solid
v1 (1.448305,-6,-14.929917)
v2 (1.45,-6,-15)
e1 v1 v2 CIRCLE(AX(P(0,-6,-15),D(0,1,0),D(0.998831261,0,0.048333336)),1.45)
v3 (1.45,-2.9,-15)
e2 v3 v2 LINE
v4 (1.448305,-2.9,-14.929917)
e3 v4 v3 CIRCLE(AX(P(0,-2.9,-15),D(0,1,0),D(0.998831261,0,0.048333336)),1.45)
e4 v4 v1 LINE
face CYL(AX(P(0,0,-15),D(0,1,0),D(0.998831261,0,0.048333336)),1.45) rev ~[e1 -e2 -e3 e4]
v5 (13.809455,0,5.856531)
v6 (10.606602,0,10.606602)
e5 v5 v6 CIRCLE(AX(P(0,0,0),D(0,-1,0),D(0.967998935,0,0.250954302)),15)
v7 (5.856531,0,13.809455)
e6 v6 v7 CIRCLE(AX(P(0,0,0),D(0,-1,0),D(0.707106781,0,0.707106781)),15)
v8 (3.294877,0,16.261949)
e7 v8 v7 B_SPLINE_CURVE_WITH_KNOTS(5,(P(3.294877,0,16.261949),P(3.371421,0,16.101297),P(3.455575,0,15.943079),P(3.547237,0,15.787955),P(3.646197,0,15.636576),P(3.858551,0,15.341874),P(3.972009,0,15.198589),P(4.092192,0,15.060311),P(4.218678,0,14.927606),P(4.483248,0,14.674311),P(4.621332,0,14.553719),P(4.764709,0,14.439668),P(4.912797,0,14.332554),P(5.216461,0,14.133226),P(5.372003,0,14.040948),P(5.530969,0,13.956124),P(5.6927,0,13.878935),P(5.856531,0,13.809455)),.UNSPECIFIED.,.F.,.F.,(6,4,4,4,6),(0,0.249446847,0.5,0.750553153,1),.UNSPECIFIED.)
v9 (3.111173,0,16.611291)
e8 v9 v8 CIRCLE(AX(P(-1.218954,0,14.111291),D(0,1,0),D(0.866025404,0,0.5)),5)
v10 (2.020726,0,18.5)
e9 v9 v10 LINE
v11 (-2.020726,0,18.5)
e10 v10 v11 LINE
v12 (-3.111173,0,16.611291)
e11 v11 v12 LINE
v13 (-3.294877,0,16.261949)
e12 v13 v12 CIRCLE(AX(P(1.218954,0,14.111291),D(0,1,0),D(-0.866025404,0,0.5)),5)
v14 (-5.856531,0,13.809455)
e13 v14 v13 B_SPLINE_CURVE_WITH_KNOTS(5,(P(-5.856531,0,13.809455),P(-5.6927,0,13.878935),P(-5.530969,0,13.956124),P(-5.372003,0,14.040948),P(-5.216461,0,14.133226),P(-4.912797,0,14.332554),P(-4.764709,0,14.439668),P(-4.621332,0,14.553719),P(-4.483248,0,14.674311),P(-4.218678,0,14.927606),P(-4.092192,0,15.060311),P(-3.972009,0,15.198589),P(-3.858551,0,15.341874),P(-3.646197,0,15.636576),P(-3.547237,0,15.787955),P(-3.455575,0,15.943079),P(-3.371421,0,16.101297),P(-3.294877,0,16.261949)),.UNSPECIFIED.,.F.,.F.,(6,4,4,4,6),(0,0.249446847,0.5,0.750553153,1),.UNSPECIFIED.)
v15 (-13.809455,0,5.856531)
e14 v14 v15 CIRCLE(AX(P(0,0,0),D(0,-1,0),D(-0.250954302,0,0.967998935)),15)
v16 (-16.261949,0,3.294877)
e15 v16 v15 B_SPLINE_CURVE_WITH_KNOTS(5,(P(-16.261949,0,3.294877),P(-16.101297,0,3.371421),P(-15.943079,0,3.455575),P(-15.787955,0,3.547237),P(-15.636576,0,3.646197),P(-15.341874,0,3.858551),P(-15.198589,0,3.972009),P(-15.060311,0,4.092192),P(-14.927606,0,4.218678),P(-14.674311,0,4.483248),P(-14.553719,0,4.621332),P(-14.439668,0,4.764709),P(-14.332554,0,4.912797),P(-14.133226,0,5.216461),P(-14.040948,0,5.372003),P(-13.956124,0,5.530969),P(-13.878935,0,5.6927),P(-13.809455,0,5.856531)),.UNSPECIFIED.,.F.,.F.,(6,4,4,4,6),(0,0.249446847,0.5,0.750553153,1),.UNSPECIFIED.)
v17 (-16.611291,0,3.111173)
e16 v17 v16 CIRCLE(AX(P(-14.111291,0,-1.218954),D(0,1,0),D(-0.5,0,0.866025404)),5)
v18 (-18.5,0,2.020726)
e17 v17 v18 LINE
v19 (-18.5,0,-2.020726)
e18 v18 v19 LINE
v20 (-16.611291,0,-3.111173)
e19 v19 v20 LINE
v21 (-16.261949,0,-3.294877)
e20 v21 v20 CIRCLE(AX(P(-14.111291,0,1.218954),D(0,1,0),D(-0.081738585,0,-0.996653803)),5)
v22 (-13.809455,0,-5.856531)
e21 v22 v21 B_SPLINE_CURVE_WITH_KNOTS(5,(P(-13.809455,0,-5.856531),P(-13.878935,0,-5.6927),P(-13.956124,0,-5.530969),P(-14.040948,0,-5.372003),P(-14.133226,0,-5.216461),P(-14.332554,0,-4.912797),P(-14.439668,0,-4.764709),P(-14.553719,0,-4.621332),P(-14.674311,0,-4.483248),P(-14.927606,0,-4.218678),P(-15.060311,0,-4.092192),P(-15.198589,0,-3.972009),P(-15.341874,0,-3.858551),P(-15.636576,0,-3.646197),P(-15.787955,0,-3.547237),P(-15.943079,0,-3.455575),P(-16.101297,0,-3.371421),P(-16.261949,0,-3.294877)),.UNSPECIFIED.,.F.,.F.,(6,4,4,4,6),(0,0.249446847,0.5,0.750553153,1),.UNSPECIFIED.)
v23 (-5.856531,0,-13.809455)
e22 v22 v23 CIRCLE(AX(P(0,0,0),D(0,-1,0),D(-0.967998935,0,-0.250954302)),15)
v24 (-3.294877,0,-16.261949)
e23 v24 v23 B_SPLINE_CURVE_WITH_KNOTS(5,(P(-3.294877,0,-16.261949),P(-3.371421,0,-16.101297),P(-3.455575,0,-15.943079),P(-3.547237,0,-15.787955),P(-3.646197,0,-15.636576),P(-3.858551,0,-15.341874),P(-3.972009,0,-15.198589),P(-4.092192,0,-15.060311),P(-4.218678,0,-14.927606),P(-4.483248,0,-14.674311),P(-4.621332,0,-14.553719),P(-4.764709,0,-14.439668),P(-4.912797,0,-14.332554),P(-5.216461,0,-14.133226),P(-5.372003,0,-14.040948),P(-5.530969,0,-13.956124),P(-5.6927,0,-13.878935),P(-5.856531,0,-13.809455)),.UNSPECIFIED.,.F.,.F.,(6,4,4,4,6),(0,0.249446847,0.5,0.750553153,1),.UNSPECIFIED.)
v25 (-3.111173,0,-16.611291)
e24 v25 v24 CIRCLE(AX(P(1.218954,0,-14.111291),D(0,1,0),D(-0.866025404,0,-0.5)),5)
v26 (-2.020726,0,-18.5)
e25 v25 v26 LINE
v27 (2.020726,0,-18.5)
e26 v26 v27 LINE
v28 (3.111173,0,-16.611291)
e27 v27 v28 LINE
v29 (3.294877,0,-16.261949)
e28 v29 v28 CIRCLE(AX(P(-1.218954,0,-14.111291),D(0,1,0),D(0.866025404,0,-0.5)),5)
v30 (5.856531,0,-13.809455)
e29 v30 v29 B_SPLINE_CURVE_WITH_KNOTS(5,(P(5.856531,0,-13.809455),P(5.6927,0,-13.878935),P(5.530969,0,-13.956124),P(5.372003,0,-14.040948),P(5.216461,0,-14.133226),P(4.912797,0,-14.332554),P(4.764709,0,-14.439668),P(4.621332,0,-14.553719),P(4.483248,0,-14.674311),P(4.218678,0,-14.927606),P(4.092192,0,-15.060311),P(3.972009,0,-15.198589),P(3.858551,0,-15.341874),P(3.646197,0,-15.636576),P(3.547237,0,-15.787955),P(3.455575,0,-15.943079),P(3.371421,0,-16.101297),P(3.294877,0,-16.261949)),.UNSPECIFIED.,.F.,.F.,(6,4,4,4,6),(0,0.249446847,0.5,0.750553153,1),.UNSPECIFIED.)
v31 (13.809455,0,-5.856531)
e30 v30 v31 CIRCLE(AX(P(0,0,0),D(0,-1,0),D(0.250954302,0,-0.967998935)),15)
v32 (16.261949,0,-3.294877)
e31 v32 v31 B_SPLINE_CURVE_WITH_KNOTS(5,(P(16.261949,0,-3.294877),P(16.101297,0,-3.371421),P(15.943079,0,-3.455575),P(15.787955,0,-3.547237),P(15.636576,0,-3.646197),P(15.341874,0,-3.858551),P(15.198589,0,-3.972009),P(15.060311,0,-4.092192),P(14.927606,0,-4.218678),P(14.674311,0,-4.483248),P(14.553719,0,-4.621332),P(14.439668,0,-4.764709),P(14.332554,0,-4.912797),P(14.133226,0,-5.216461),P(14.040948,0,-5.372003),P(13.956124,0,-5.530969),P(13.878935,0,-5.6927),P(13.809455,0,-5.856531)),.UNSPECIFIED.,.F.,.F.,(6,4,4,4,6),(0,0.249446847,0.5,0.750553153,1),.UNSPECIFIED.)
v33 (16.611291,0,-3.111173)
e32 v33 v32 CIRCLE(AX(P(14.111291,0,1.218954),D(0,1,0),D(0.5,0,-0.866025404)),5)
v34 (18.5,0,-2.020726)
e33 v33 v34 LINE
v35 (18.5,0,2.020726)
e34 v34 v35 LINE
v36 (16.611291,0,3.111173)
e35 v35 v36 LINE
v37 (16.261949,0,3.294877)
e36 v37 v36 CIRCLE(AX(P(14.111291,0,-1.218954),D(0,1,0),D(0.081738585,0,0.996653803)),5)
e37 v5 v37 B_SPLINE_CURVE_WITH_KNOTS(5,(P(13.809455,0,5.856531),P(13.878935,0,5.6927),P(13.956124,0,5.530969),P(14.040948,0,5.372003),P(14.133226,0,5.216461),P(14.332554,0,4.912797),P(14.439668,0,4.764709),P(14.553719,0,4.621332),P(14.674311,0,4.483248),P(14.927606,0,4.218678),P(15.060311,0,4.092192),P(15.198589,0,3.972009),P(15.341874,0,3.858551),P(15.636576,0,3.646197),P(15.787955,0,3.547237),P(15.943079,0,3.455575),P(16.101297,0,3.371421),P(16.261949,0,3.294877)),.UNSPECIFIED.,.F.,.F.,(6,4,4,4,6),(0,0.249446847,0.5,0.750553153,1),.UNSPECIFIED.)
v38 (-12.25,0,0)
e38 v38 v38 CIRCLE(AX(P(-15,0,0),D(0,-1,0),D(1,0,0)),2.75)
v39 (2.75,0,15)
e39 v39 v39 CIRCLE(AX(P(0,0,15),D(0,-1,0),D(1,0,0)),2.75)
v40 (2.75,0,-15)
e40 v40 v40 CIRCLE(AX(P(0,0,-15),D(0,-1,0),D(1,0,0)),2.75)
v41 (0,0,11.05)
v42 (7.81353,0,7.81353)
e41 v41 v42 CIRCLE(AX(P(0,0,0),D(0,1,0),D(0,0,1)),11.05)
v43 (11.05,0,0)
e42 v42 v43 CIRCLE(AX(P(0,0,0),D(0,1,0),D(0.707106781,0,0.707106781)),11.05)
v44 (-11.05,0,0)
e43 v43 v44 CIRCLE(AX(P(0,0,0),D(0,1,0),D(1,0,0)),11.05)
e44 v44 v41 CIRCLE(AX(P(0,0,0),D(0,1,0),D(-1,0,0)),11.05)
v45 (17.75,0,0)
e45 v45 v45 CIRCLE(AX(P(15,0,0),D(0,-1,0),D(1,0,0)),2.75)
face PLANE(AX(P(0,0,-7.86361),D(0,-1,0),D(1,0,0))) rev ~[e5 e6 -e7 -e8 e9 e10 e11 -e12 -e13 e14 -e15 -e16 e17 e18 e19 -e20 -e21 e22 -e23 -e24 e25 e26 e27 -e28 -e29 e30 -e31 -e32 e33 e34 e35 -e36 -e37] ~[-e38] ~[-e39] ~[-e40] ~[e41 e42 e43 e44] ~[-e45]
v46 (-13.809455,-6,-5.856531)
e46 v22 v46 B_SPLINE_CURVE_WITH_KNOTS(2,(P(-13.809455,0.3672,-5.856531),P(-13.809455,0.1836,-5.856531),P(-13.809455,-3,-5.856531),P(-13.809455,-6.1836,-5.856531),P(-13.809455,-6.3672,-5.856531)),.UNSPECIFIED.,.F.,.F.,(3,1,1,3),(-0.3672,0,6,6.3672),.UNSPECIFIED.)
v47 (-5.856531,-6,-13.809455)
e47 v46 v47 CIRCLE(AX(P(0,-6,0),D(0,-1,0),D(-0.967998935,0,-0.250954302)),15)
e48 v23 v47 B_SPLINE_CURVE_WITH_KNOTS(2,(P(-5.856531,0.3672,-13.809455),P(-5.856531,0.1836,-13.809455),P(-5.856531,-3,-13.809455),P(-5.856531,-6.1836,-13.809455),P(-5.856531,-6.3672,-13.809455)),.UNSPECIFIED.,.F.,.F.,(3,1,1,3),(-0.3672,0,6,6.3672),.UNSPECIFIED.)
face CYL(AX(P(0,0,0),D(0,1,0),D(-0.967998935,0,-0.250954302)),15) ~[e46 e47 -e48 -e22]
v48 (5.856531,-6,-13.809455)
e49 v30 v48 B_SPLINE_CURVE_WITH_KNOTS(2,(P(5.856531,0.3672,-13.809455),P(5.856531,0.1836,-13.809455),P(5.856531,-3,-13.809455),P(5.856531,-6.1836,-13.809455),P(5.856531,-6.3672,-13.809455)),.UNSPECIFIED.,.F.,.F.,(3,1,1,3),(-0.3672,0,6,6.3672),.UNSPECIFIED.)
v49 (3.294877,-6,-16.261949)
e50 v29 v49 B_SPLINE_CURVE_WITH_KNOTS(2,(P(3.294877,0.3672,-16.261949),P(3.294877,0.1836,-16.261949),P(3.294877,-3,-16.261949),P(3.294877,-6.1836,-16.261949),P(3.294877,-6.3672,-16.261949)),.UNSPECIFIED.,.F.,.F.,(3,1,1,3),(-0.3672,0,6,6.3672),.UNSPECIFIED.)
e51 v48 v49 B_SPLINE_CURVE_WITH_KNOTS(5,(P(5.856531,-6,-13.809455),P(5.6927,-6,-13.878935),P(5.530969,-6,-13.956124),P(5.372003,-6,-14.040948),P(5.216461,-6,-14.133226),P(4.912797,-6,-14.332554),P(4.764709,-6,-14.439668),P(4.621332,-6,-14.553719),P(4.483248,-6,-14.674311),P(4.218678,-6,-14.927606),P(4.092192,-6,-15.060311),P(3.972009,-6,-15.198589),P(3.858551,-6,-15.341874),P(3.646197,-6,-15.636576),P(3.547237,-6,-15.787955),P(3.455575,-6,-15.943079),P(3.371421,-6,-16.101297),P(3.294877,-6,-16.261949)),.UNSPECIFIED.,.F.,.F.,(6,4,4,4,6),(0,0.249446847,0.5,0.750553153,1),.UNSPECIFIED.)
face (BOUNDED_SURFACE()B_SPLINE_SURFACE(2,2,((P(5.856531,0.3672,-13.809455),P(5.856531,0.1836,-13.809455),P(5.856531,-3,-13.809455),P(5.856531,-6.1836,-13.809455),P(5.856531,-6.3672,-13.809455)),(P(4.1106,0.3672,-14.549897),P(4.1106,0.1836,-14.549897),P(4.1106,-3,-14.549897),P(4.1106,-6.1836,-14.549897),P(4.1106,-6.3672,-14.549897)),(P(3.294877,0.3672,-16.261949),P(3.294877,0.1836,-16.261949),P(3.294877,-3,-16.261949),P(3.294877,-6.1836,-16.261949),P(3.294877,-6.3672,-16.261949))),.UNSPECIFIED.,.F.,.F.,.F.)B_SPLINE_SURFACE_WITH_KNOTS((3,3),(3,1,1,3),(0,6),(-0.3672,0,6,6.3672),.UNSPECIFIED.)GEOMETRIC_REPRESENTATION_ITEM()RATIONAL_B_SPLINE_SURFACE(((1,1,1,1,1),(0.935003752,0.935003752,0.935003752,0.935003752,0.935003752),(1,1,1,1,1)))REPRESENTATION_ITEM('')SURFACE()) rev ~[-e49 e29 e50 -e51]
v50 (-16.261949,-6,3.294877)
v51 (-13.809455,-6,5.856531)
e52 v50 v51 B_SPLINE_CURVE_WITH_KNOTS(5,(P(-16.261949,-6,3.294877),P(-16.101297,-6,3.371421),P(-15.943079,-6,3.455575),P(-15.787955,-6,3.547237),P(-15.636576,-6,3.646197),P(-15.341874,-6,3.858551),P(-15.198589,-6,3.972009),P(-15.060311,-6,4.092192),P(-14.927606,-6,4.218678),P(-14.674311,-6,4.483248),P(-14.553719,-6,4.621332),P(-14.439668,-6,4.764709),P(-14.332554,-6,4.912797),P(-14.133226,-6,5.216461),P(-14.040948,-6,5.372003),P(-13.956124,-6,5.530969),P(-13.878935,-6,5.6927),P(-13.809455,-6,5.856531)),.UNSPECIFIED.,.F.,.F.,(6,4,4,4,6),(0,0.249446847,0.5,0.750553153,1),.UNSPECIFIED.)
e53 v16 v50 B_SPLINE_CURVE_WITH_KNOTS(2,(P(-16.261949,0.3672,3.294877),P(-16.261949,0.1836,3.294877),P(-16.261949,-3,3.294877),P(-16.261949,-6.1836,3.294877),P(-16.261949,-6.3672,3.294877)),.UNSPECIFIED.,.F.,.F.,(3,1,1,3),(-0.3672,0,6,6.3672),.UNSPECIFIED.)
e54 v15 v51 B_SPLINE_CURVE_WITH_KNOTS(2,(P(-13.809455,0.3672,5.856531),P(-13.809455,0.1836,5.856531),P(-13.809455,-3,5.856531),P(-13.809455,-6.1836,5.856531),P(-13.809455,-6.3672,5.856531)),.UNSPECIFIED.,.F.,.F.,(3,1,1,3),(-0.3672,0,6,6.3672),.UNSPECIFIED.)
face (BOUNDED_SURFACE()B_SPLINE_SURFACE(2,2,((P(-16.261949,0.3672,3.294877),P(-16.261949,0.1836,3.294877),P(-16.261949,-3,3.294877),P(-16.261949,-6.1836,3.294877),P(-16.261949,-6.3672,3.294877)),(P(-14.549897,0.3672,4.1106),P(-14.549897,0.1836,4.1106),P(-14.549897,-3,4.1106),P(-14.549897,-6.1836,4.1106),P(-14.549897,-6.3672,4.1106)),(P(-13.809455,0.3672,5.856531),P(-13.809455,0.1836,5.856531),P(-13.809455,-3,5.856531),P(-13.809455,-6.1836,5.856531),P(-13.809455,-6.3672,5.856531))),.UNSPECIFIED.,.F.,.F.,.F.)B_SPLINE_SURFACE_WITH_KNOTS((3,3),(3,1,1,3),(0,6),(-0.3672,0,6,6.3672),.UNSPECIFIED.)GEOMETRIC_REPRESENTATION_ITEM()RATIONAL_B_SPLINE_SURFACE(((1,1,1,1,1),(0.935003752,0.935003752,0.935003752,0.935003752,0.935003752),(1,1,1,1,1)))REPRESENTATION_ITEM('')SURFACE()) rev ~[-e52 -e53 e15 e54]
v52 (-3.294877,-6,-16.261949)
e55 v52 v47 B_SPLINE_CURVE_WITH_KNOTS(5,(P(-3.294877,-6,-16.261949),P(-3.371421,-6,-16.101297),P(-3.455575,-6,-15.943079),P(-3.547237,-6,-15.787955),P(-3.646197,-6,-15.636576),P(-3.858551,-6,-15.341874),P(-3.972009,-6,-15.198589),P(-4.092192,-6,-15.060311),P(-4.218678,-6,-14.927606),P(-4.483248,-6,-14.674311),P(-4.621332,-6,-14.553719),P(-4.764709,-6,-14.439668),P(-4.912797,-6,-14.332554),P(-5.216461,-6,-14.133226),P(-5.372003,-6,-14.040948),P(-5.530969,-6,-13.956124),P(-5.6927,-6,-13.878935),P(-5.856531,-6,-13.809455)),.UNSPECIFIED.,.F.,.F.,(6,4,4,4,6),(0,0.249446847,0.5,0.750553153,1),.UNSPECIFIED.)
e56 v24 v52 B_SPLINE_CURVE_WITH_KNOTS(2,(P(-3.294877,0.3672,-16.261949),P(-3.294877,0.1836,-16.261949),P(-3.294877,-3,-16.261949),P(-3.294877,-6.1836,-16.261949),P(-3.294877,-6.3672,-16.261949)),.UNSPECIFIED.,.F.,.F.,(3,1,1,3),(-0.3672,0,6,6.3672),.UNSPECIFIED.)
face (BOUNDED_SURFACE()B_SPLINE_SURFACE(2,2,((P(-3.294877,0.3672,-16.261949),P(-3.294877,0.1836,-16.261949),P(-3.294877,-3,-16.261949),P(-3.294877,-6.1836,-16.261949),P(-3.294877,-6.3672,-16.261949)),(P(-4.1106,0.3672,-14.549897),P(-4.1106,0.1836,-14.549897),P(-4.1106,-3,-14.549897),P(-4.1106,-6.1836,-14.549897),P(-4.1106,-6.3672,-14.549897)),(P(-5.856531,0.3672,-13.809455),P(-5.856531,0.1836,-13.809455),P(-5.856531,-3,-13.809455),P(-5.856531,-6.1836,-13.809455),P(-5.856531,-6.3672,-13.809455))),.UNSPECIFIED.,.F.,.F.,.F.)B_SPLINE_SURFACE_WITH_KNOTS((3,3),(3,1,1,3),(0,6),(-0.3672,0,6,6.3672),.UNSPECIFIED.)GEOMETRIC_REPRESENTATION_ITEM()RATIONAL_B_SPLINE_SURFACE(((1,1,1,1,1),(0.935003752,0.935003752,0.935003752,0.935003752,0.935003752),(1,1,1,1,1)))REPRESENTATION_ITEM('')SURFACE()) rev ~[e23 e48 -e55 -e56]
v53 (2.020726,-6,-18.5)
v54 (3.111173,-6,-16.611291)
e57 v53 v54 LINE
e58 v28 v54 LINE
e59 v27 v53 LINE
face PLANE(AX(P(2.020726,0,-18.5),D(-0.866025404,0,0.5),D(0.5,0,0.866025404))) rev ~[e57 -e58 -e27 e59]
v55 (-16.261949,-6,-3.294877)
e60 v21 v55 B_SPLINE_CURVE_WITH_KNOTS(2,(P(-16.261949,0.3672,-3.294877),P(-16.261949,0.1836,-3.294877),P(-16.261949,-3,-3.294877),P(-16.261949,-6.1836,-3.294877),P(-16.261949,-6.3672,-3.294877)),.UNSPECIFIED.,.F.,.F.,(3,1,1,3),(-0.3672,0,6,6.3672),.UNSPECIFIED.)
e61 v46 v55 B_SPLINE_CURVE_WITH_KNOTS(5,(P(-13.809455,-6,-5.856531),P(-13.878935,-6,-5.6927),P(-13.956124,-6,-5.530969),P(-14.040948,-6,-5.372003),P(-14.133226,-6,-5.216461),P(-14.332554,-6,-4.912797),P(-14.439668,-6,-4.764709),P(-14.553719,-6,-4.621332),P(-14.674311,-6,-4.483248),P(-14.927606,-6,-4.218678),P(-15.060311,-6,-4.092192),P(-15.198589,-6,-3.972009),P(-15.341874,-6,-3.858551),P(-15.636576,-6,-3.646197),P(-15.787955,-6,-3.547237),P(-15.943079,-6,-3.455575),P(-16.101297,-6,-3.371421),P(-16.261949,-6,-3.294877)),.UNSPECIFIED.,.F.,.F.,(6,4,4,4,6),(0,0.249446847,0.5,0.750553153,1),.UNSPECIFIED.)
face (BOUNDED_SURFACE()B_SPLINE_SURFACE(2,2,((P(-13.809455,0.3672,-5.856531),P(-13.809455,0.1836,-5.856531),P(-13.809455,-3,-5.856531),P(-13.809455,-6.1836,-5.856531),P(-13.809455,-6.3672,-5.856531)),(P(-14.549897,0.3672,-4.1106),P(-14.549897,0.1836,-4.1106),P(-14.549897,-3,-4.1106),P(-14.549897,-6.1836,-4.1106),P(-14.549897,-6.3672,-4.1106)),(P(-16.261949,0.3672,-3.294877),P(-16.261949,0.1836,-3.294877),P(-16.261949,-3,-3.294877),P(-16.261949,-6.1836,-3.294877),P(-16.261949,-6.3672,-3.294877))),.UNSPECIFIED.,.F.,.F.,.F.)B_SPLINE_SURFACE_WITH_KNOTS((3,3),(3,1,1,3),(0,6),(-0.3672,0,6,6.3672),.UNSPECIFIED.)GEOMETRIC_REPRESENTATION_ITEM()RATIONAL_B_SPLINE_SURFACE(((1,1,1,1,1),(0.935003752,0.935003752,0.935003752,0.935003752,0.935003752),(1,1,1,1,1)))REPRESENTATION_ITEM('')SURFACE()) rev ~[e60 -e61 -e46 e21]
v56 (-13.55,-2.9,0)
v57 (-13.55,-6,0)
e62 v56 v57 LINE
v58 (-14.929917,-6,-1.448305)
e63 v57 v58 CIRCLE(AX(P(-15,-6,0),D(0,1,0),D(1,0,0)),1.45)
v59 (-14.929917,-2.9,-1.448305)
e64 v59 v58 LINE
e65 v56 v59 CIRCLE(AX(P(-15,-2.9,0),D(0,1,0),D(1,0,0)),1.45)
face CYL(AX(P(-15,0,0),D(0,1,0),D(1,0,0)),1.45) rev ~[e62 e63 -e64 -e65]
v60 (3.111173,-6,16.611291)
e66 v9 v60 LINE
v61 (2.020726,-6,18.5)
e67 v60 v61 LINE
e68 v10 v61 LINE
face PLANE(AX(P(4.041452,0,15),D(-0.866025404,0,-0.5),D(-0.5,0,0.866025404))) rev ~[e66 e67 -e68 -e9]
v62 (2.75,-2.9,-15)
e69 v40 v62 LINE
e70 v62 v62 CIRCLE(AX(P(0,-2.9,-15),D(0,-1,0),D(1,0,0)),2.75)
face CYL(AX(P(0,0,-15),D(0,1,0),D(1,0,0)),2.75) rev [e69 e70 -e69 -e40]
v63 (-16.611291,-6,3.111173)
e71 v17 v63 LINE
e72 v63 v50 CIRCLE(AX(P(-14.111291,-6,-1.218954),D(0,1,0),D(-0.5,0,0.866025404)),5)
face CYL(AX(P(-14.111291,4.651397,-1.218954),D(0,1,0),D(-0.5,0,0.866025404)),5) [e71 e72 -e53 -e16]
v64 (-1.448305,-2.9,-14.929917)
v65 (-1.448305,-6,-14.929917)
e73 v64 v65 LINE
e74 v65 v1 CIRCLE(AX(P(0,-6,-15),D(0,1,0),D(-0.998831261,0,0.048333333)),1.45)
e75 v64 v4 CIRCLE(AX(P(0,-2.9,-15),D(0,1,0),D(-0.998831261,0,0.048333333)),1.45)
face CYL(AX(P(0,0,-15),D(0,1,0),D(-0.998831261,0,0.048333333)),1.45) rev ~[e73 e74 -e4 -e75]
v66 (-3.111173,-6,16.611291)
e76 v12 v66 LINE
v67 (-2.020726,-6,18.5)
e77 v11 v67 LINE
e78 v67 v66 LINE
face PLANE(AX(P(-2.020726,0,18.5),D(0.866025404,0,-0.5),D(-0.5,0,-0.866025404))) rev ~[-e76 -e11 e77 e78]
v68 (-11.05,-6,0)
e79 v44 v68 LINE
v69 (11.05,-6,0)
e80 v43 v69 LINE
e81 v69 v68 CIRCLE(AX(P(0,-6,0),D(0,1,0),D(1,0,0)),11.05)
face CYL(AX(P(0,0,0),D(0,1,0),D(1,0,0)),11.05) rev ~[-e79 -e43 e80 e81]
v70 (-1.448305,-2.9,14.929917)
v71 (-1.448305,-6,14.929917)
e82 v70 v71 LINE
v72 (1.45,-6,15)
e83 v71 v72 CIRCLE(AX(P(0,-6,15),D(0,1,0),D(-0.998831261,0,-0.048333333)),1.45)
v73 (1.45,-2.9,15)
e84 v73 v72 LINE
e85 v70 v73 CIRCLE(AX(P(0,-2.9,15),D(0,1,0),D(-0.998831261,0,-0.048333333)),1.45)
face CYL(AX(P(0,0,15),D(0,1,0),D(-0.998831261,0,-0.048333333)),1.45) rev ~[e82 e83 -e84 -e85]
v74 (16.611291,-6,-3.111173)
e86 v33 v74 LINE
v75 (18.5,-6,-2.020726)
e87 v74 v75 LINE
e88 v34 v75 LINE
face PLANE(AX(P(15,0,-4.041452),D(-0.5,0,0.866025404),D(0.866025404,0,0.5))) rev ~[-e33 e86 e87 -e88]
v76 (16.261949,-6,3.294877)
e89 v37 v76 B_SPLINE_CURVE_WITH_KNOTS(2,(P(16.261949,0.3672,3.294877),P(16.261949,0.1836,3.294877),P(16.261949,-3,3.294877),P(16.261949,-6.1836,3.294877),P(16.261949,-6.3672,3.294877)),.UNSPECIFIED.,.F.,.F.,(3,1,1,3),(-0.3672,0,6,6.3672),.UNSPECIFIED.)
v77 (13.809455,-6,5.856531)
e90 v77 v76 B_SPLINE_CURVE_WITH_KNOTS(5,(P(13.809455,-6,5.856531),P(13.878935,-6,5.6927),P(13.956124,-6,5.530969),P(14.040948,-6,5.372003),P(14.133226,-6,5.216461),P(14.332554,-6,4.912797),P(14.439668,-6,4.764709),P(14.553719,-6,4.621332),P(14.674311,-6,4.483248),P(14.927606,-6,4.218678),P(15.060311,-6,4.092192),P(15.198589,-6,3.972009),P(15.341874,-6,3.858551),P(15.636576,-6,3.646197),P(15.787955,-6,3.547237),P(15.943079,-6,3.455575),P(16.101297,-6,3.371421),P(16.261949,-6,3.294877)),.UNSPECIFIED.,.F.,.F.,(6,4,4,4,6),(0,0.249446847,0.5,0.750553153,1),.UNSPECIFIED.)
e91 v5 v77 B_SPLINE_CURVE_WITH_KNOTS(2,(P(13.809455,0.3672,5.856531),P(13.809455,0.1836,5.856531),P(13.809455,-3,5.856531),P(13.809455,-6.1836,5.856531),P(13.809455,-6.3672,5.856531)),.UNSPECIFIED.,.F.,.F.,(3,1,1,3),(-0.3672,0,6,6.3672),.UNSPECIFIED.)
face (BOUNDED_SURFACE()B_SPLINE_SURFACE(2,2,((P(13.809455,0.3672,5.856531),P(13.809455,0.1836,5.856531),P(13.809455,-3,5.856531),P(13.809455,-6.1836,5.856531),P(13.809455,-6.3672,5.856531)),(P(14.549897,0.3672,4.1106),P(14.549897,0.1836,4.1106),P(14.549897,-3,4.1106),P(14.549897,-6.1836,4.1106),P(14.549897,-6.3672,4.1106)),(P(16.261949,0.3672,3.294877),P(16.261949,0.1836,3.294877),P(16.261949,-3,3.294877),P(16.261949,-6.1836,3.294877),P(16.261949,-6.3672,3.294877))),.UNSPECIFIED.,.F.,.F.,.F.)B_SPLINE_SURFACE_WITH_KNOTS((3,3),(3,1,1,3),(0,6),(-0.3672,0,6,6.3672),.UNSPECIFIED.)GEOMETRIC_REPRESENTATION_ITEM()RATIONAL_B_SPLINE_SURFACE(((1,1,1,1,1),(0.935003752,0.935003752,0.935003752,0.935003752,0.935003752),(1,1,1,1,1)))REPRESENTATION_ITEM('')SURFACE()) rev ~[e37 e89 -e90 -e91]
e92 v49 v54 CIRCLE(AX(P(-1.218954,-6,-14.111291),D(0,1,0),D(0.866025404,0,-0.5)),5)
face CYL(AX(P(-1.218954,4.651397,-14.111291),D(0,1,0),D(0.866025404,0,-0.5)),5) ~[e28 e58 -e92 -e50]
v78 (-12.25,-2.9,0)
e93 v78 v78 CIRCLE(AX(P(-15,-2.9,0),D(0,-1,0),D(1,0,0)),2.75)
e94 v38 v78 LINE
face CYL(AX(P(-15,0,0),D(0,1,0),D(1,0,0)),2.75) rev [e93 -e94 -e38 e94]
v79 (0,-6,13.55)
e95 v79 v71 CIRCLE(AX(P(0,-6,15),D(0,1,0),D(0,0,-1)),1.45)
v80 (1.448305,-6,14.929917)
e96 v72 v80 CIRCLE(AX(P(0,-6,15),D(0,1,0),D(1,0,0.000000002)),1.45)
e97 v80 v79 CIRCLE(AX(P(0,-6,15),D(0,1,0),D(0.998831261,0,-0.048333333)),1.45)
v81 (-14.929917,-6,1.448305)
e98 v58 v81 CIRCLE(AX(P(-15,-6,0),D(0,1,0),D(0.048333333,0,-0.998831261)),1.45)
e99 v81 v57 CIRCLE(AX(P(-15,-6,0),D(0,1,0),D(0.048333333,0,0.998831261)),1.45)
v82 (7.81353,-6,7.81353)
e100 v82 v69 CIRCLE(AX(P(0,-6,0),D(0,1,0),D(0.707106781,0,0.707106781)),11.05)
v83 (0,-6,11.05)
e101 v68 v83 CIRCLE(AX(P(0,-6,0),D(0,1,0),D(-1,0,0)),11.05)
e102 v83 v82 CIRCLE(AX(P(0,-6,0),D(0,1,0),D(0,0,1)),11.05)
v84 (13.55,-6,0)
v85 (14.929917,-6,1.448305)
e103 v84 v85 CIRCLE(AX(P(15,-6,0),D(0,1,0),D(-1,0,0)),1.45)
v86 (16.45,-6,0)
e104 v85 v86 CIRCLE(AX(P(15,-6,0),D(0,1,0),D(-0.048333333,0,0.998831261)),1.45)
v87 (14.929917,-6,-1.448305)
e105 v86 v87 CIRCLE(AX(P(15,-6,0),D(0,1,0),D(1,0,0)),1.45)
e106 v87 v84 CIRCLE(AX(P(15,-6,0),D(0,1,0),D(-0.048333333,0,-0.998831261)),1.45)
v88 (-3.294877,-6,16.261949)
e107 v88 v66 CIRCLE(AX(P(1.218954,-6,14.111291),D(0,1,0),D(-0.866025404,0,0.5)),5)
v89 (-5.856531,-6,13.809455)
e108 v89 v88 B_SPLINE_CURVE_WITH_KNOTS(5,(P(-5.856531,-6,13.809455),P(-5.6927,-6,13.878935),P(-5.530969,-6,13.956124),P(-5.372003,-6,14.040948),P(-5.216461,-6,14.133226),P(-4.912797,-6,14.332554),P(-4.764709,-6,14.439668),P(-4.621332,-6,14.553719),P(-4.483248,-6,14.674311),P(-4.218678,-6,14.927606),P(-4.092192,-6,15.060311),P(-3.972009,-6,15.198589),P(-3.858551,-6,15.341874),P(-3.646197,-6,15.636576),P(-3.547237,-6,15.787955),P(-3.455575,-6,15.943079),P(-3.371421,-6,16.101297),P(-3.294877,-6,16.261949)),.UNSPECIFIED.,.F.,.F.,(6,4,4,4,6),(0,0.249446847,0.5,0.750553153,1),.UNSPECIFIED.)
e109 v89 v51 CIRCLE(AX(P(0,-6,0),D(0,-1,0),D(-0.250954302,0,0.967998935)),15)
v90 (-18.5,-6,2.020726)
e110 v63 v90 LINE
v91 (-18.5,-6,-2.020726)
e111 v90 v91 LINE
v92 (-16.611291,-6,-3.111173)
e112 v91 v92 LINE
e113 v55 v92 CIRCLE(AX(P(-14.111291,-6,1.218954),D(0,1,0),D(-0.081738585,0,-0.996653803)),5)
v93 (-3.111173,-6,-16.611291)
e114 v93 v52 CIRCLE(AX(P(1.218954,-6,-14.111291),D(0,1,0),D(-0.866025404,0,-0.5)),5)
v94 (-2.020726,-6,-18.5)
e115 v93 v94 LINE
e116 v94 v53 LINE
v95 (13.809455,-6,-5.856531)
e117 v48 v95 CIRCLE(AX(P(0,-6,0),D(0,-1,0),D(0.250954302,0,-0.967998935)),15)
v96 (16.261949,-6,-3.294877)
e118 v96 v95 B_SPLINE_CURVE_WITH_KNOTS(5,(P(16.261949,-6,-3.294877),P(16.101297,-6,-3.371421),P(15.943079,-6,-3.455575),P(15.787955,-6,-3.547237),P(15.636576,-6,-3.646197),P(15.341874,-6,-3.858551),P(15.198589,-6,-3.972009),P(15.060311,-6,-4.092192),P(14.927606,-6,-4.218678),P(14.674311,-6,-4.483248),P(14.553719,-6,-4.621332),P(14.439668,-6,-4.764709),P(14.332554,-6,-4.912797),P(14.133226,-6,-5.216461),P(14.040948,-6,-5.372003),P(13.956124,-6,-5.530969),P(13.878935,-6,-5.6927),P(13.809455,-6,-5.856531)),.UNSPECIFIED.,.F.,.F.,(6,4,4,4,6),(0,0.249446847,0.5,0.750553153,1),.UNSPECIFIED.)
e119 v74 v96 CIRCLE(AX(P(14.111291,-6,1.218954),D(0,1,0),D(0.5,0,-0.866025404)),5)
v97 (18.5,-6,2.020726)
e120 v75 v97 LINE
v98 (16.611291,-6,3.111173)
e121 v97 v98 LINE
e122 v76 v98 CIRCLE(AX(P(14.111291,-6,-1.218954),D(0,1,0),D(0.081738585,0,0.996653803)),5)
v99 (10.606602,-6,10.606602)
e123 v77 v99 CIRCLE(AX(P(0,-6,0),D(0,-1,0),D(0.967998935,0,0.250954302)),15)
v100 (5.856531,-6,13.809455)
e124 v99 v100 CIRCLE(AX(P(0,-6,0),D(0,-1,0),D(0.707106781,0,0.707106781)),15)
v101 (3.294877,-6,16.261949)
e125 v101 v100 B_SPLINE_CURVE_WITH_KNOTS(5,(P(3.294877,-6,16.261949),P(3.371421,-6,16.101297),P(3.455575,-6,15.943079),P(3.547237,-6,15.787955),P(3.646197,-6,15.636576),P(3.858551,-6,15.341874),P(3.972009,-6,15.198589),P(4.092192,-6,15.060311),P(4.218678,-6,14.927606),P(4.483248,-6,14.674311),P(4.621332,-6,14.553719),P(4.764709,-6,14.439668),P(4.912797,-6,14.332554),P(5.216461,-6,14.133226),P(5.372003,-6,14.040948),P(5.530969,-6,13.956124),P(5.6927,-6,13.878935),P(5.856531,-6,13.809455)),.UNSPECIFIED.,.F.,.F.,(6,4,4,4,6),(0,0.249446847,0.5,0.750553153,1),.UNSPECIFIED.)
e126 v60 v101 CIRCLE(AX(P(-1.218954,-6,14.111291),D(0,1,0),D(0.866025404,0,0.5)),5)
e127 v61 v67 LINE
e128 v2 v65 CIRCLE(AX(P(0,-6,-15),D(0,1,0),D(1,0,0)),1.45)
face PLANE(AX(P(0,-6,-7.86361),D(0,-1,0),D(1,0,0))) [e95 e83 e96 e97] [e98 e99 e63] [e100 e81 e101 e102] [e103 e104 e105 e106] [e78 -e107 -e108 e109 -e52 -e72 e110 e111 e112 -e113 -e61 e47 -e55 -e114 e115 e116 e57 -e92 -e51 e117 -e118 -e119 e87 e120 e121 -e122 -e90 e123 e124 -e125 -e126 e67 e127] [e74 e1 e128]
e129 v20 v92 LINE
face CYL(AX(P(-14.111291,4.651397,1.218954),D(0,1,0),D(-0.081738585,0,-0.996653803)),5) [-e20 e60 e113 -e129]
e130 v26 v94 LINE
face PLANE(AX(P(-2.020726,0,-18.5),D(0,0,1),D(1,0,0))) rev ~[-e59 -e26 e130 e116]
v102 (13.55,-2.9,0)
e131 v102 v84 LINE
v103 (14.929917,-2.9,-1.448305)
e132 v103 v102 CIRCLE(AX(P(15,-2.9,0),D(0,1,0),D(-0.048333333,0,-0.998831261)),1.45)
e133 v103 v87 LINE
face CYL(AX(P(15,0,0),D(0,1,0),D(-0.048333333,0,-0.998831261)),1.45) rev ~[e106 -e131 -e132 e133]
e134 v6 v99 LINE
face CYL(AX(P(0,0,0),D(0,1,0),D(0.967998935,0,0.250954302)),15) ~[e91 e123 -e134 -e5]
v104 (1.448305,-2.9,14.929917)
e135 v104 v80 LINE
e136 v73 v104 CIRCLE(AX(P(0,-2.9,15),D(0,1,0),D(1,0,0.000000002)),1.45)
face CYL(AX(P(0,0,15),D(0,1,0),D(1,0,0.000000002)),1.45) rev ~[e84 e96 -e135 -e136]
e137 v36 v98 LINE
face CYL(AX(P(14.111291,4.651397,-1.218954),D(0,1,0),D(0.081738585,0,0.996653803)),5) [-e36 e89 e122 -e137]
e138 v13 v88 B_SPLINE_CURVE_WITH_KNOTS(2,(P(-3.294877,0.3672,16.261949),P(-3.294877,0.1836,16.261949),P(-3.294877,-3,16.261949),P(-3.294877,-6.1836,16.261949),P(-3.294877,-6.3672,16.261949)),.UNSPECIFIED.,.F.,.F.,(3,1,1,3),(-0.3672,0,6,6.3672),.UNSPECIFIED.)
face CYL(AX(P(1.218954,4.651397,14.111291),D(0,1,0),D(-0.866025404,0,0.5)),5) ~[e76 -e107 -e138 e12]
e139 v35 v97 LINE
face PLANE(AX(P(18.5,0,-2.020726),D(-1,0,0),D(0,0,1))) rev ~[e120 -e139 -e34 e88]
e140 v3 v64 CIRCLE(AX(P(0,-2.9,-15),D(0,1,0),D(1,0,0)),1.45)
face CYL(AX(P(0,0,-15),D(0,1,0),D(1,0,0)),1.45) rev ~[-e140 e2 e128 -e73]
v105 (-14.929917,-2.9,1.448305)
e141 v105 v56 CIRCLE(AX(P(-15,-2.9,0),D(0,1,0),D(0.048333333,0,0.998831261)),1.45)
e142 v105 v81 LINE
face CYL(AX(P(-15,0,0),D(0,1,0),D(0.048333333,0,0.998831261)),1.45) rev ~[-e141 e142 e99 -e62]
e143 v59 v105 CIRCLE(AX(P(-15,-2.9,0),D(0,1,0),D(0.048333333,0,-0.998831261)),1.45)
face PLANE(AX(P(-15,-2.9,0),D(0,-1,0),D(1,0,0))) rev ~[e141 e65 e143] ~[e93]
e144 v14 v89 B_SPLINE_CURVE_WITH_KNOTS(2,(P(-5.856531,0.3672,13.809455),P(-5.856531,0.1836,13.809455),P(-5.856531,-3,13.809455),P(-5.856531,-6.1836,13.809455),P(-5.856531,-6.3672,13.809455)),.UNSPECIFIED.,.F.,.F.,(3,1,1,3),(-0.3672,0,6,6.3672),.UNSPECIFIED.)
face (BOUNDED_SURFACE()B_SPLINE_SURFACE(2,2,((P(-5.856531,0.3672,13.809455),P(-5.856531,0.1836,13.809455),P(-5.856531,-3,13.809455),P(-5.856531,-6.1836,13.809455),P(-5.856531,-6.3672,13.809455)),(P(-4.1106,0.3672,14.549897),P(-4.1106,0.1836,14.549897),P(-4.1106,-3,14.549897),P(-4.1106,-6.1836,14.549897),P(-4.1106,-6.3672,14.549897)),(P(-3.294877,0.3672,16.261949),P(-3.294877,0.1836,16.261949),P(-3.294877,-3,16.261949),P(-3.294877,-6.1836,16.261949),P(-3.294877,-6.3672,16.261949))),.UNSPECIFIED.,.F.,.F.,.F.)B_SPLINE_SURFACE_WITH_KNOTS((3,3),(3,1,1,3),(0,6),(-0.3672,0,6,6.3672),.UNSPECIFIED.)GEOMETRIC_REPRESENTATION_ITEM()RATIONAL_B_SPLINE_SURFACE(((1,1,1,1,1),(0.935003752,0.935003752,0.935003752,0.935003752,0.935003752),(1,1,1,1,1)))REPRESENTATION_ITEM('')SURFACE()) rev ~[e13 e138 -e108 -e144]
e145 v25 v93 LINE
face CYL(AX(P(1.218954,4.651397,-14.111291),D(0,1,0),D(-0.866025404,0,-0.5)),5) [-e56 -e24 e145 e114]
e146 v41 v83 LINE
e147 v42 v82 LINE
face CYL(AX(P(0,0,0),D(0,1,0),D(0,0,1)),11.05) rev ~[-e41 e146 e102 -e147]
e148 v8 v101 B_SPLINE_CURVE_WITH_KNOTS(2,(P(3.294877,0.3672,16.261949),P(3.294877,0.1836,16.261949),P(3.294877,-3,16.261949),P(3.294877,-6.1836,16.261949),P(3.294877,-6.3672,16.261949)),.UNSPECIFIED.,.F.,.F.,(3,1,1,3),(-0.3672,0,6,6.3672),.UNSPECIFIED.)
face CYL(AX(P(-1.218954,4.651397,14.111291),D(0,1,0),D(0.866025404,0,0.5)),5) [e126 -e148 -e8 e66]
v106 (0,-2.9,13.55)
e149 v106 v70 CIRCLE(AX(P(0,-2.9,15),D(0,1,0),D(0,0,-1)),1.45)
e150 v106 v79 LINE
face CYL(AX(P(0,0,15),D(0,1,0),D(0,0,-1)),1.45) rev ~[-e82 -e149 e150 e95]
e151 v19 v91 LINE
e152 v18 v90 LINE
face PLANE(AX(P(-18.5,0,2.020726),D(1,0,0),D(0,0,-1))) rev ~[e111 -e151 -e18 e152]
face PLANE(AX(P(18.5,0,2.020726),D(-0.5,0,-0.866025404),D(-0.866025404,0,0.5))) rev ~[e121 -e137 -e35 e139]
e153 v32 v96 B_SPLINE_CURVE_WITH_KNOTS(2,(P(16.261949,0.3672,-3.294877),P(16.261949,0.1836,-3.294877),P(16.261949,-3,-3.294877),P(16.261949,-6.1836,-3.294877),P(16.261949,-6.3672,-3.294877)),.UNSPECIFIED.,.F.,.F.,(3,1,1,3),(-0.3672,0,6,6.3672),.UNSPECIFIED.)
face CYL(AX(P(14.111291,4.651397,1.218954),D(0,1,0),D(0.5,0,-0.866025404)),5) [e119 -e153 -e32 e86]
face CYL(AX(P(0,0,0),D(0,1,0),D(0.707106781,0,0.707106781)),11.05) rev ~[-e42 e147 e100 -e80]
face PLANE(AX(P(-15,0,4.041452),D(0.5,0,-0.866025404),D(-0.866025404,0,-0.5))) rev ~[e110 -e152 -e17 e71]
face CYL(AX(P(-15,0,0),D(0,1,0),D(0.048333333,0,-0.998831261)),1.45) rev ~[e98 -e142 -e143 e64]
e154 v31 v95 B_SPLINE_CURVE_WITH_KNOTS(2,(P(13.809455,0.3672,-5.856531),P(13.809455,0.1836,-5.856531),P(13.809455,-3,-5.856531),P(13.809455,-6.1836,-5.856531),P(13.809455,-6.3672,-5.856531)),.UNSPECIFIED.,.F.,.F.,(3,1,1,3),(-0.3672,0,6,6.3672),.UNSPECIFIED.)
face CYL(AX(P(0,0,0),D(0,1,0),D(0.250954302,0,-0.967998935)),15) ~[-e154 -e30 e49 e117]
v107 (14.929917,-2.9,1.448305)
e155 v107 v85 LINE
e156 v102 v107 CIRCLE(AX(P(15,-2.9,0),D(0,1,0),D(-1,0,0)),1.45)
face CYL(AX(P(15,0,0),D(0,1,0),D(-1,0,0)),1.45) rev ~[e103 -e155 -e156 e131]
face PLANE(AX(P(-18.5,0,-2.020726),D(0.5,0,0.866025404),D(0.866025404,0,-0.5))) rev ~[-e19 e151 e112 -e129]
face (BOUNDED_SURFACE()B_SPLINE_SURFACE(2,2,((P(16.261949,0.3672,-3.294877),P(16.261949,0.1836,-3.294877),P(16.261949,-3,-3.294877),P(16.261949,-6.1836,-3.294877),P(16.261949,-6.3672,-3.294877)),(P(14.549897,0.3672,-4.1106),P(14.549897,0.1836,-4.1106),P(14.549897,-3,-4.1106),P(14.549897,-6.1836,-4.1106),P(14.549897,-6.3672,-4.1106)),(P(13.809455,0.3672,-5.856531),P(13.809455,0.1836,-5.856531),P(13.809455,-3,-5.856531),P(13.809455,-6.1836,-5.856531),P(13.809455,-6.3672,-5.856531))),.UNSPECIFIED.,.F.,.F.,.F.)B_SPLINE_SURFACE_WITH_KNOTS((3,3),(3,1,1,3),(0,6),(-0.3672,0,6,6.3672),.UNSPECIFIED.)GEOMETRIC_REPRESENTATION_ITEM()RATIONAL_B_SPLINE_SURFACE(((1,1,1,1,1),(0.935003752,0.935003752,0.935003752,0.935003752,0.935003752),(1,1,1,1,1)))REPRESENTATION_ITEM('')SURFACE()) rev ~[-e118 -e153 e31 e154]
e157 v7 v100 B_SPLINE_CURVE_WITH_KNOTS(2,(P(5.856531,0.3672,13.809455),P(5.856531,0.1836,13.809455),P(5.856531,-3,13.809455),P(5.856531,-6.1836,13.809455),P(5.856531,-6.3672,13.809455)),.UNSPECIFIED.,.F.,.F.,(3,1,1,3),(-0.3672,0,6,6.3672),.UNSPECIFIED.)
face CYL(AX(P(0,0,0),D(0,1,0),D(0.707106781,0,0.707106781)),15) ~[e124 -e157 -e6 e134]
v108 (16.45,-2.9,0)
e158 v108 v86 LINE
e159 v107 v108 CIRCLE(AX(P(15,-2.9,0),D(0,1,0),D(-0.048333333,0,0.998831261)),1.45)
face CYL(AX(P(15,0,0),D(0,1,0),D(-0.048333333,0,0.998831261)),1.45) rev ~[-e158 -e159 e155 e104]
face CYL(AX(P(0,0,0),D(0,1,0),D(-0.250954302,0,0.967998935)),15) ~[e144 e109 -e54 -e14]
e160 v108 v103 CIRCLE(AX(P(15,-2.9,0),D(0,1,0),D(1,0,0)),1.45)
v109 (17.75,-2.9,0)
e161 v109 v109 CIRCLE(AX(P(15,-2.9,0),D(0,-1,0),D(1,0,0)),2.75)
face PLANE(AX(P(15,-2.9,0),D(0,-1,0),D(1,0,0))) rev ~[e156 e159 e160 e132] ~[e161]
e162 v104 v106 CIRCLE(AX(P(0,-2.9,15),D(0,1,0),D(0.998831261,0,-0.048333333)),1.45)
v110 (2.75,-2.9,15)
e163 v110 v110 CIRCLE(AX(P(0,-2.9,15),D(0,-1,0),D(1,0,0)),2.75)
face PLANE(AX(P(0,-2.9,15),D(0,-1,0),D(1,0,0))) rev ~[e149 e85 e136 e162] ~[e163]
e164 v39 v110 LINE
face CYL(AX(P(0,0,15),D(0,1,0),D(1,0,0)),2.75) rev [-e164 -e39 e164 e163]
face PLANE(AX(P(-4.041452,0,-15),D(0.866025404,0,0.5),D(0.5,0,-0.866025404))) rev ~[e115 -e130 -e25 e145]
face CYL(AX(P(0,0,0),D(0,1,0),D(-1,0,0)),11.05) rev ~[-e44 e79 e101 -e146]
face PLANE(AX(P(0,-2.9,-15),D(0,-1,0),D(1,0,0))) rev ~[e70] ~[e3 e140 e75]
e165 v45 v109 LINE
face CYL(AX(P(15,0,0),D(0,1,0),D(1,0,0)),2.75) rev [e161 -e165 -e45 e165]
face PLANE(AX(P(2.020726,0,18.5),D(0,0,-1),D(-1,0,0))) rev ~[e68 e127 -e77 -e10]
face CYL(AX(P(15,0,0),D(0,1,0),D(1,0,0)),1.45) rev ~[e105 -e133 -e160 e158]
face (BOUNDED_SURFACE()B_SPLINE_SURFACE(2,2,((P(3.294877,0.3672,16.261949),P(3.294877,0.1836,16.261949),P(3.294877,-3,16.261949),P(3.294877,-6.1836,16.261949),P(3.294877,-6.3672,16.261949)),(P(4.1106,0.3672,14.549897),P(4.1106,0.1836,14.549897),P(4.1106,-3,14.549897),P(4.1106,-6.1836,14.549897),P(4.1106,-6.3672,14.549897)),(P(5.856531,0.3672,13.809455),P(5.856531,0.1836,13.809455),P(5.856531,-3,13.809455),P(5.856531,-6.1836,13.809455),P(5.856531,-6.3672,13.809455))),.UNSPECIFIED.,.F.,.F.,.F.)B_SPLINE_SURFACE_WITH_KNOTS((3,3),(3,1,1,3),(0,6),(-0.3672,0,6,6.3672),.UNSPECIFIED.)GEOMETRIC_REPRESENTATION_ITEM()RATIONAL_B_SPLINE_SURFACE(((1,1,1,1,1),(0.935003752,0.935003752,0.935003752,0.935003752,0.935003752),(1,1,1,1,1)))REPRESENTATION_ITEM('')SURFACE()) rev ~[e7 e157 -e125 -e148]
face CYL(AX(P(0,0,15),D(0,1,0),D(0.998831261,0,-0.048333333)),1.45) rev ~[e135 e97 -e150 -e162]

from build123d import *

# Parameters (mm, degrees)
F1_DEPTH     = 6
F2_T1_DEPTH  = 15.3027934974
F3_R         = 5
F4_T1_DEPTH  = 15.3027934974
F5_R         = 5
F6_T1_DEPTH  = 15.3027934974
F7_R         = 5
F8_T1_DEPTH  = 15.3027934974
F9_R         = 5
F10_T1_DEPTH = 15.3027934974
F11_R        = 5
F12_T1_DEPTH = 15.3027934974
F13_R        = 5
F14_R        = 2.75
F15_DEPTH    = 2.9


# Not quite as in the source:
# - a fillet or chamfer that OpenCascade refuses, or shapes differently, is made with other operations: its cross-section is extruded or revolved along the edge and cut away or added


with BuildPart() as f1:
    # F0 (on Front) → F1 (new body)
    with BuildSketch(Plane.XZ):
        with BuildLine():
            Line((11.5, 0), (11.05, 0))
            ThreePointArc((11.05, 0), (0, -11.05), (-11.05, 0))
            Line((-11.05, 0), (-11.5, 0))
            Line((-11.5, 0), (-11.5, -2.0207259422))
            Line((-11.5, -2.0207259422), (-14.5199840255, -3.7643145323))
            ThreePointArc((-14.5199840255, -3.7643145323), (-10.6066017178, -10.6066017178), (-3.7643145323, -14.5199840255))
            Line((-3.7643145323, -14.5199840255), (-2.0207259422, -11.5))
            Line((-2.0207259422, -11.5), (2.0207259422, -11.5))
            Line((2.0207259422, -11.5), (3.7643145323, -14.5199840255))
            ThreePointArc((3.7643145323, -14.5199840255), (10.6066017178, -10.6066017178), (14.5199840255, -3.7643145323))
            Line((14.5199840255, -3.7643145323), (11.5, -2.0207259422))
            Line((11.5, -2.0207259422), (11.5, 0))
        make_face()
        with BuildLine():
            ThreePointArc((7.8135299321, 7.8135299321), (10.2088688342, 4.2286519276), (11.05, 0))
            Line((11.05, 0), (11.5, 0))
            Line((11.5, 0), (11.5, 2.0207259422))
            Line((11.5, 2.0207259422), (14.5199840255, 3.7643145323))
            ThreePointArc((14.5199840255, 3.7643145323), (13.020773835, 7.4471100931), (10.6066017178, 10.6066017178))
            Line((10.6066017178, 10.6066017178), (7.8135299321, 7.8135299321))
        make_face()
        with BuildLine():
            ThreePointArc((0, 11.05), (4.2286519276, 10.2088688342), (7.8135299321, 7.8135299321))
            Line((7.8135299321, 7.8135299321), (10.6066017178, 10.6066017178))
            ThreePointArc((10.6066017178, 10.6066017178), (7.4471100931, 13.020773835), (3.7643145323, 14.5199840255))
            Line((3.7643145323, 14.5199840255), (2.0207259422, 11.5))
            Line((2.0207259422, 11.5), (0, 11.5))
            Line((0, 11.5), (0, 11.05))
        make_face()
        with BuildLine():
            Line((-11.5, 0), (-11.05, 0))
            ThreePointArc((-11.05, 0), (-7.8135299321, 7.8135299321), (0, 11.05))
            Line((0, 11.05), (0, 11.5))
            Line((0, 11.5), (-2.0207259422, 11.5))
            Line((-2.0207259422, 11.5), (-3.7643145323, 14.5199840255))
            ThreePointArc((-3.7643145323, 14.5199840255), (-10.6066017178, 10.6066017178), (-14.5199840255, 3.7643145323))
            Line((-14.5199840255, 3.7643145323), (-11.5, 2.0207259422))
            Line((-11.5, 2.0207259422), (-11.5, 0))
        make_face()
        with BuildLine():
            Line((11.5, 2.0207259422), (11.5, 0))
            Line((11.5, 0), (13.55, 0))
            ThreePointArc((13.55, 0), (13.9502093463, 1.0002197675), (14.9299166667, 1.4483053291))
            ThreePointArc((14.9299166667, 1.4483053291), (14.770414258, 2.6143570237), (14.5199840255, 3.7643145323))
            Line((14.5199840255, 3.7643145323), (11.5, 2.0207259422))
        make_face()
        with BuildLine():
            Line((13.55, 0), (11.5, 0))
            Line((11.5, 0), (11.5, -2.0207259422))
            Line((11.5, -2.0207259422), (14.5199840255, -3.7643145323))
            ThreePointArc((14.5199840255, -3.7643145323), (14.770414258, -2.6143570237), (14.9299166667, -1.4483053291))
            ThreePointArc((14.9299166667, -1.4483053291), (13.9502093463, -1.0002197675), (13.55, 0))
        make_face()
        with BuildLine():
            Line((-11.5, -2.0207259422), (-11.5, 0))
            Line((-11.5, 0), (-13.55, 0))
            ThreePointArc((-13.55, 0), (-13.9502093463, -1.0002197675), (-14.9299166667, -1.4483053291))
            ThreePointArc((-14.9299166667, -1.4483053291), (-14.770414258, -2.6143570237), (-14.5199840255, -3.7643145323))
            Line((-14.5199840255, -3.7643145323), (-11.5, -2.0207259422))
        make_face()
        with BuildLine():
            Line((-13.55, 0), (-11.5, 0))
            Line((-11.5, 0), (-11.5, 2.0207259422))
            Line((-11.5, 2.0207259422), (-14.5199840255, 3.7643145323))
            ThreePointArc((-14.5199840255, 3.7643145323), (-14.770414258, 2.6143570237), (-14.9299166667, 1.4483053291))
            ThreePointArc((-14.9299166667, 1.4483053291), (-13.9502093463, 1.0002197675), (-13.55, 0))
        make_face()
        with BuildLine():
            Line((0, 13.55), (0, 11.5))
            Line((0, 11.5), (2.0207259422, 11.5))
            Line((2.0207259422, 11.5), (3.7643145323, 14.5199840255))
            ThreePointArc((3.7643145323, 14.5199840255), (2.6143570237, 14.770414258), (1.4483053291, 14.9299166667))
            ThreePointArc((1.4483053291, 14.9299166667), (1.0002197675, 13.9502093463), (0, 13.55))
        make_face()
        with BuildLine():
            Line((-2.0207259422, 11.5), (0, 11.5))
            Line((0, 11.5), (0, 13.55))
            ThreePointArc((0, 13.55), (-1.0002197675, 13.9502093463), (-1.4483053291, 14.9299166667))
            ThreePointArc((-1.4483053291, 14.9299166667), (-2.6143570237, 14.770414258), (-3.7643145323, 14.5199840255))
            Line((-3.7643145323, 14.5199840255), (-2.0207259422, 11.5))
        make_face()
        with BuildLine():
            Line((15, 4.0414518843), (14.5199840255, 3.7643145323))
            ThreePointArc((14.5199840255, 3.7643145323), (14.770414258, 2.6143570237), (14.9299166667, 1.4483053291))
            ThreePointArc((14.9299166667, 1.4483053291), (16.0002197675, 1.0497906537), (16.45, 0))
            ThreePointArc((16.45, 0), (16.0002197675, -1.0497906537), (14.9299166667, -1.4483053291))
            ThreePointArc((14.9299166667, -1.4483053291), (14.770414258, -2.6143570237), (14.5199840255, -3.7643145323))
            Line((14.5199840255, -3.7643145323), (15, -4.0414518843))
            Line((15, -4.0414518843), (18.5, -2.0207259422))
            Line((18.5, -2.0207259422), (18.5, 2.0207259422))
            Line((18.5, 2.0207259422), (15, 4.0414518843))
        make_face()
        with BuildLine():
            ThreePointArc((1.4483053291, 14.9299166667), (2.6143570237, 14.770414258), (3.7643145323, 14.5199840255))
            Line((3.7643145323, 14.5199840255), (4.0414518843, 15))
            Line((4.0414518843, 15), (2.0207259422, 18.5))
            Line((2.0207259422, 18.5), (-2.0207259422, 18.5))
            Line((-2.0207259422, 18.5), (-4.0414518843, 15))
            Line((-4.0414518843, 15), (-3.7643145323, 14.5199840255))
            ThreePointArc((-3.7643145323, 14.5199840255), (-2.6143570237, 14.770414258), (-1.4483053291, 14.9299166667))
            ThreePointArc((-1.4483053291, 14.9299166667), (-0.0350519098, 16.4495762704), (1.45, 15))
            ThreePointArc((1.45, 15), (1.4495762704, 14.9649480902), (1.4483053291, 14.9299166667))
        make_face()
        with BuildLine():
            ThreePointArc((-14.9299166667, -1.4483053291), (-16.45, 0), (-14.9299166667, 1.4483053291))
            ThreePointArc((-14.9299166667, 1.4483053291), (-14.770414258, 2.6143570237), (-14.5199840255, 3.7643145323))
            Line((-14.5199840255, 3.7643145323), (-15, 4.0414518843))
            Line((-15, 4.0414518843), (-18.5, 2.0207259422))
            Line((-18.5, 2.0207259422), (-18.5, -2.0207259422))
            Line((-18.5, -2.0207259422), (-15, -4.0414518843))
            Line((-15, -4.0414518843), (-14.5199840255, -3.7643145323))
            ThreePointArc((-14.5199840255, -3.7643145323), (-14.770414258, -2.6143570237), (-14.9299166667, -1.4483053291))
        make_face()
        with BuildLine():
            Line((4.0414518843, -15), (3.7643145323, -14.5199840255))
            ThreePointArc((3.7643145323, -14.5199840255), (2.6143570237, -14.770414258), (1.4483053291, -14.9299166667))
            ThreePointArc((1.4483053291, -14.9299166667), (1.4495762704, -14.9649480902), (1.45, -15))
            ThreePointArc((1.45, -15), (-0.0350519098, -16.4495762704), (-1.4483053291, -14.9299166667))
            ThreePointArc((-1.4483053291, -14.9299166667), (-2.6143570237, -14.770414258), (-3.7643145323, -14.5199840255))
            Line((-3.7643145323, -14.5199840255), (-4.0414518843, -15))
            Line((-4.0414518843, -15), (-2.0207259422, -18.5))
            Line((-2.0207259422, -18.5), (2.0207259422, -18.5))
            Line((2.0207259422, -18.5), (4.0414518843, -15))
        make_face()
        with BuildLine():
            ThreePointArc((1.4483053291, -14.9299166667), (2.6143570237, -14.770414258), (3.7643145323, -14.5199840255))
            Line((3.7643145323, -14.5199840255), (2.0207259422, -11.5))
            Line((2.0207259422, -11.5), (-2.0207259422, -11.5))
            Line((-2.0207259422, -11.5), (-3.7643145323, -14.5199840255))
            ThreePointArc((-3.7643145323, -14.5199840255), (-2.6143570237, -14.770414258), (-1.4483053291, -14.9299166667))
            ThreePointArc((-1.4483053291, -14.9299166667), (0, -13.55), (1.4483053291, -14.9299166667))
        make_face()
    extrude(amount=F1_DEPTH)

    # F2: fillet of radius 5 on 1 edges, made by hand

    # F2_s2 → F2_t1 (cut)
    with BuildSketch(Plane.XZ.offset(-4.6513967487)):
        with BuildLine():
            ThreePointArc((-3.1111725346, 16.611291099), (-3.5536996774, 15.6018521519), (-3.7643145323, 14.5199840255))
            Line((-3.7643145323, 14.5199840255), (-3.8639799126, 14.5281578841))
            ThreePointArc((-3.8639799126, 14.5281578841), (-3.9894857487, 14.7099920128), (-4.1280544247, 14.95))
            Line((-4.1280544247, 14.95), (-4.1280544247, 15.05))
            Line((-4.1280544247, 15.05), (-3.197775075, 16.661291099))
            Line((-3.197775075, 16.661291099), (-3.1111725346, 16.611291099))
        make_face()
    extrude(amount=F2_T1_DEPTH, mode=Mode.SUBTRACT)

    # F3
    f3_edges = [f1.edges().sort_by_distance(p)[0] for p in [
        (-3.764315, -3, 14.519984),
    ]]
    fillet(f3_edges, radius=F3_R)

    # F4: fillet of radius 5 on 1 edges, made by hand

    # F4_s2 → F4_t1 (cut)
    with BuildSketch(Plane.XZ.offset(-4.6513967487)):
        with BuildLine():
            ThreePointArc((3.1111725346, 16.611291099), (3.5536996774, 15.6018521519), (3.7643145323, 14.5199840255))
            Line((3.7643145323, 14.5199840255), (3.8639799126, 14.5281578841))
            ThreePointArc((3.8639799126, 14.5281578841), (3.9894857487, 14.7099920128), (4.1280544247, 14.95))
            Line((4.1280544247, 14.95), (4.1280544247, 15.05))
            Line((4.1280544247, 15.05), (3.197775075, 16.661291099))
            Line((3.197775075, 16.661291099), (3.1111725346, 16.611291099))
        make_face()
    extrude(amount=F4_T1_DEPTH, mode=Mode.SUBTRACT)

    # F5
    f5_edges = [f1.edges().sort_by_distance(p)[0] for p in [
        (3.764315, -3, 14.519984),
    ]]
    fillet(f5_edges, radius=F5_R)

    # F6: fillet of radius 5 on 2 edges, made by hand

    # F6_s2 → F6_t1 (cut)
    with BuildSketch(Plane.XZ.offset(-4.6513967487)):
        with BuildLine():
            ThreePointArc((14.5199840255, 3.7643145323), (15.6018521519, 3.5536996774), (16.611291099, 3.1111725346))
            Line((16.611291099, 3.1111725346), (16.661291099, 3.197775075))
            Line((16.661291099, 3.197775075), (15.05, 4.1280544247))
            Line((15.05, 4.1280544247), (14.95, 4.1280544247))
            ThreePointArc((14.95, 4.1280544247), (14.7099920128, 3.9894857487), (14.5281578841, 3.8639799126))
            Line((14.5281578841, 3.8639799126), (14.5199840255, 3.7643145323))
        make_face()
        with BuildLine():
            ThreePointArc((16.611291099, -3.1111725346), (15.6018521519, -3.5536996774), (14.5199840255, -3.7643145323))
            Line((14.5199840255, -3.7643145323), (14.5281578841, -3.8639799126))
            ThreePointArc((14.5281578841, -3.8639799126), (14.7099920128, -3.9894857487), (14.95, -4.1280544247))
            Line((14.95, -4.1280544247), (15.05, -4.1280544247))
            Line((15.05, -4.1280544247), (16.661291099, -3.197775075))
            Line((16.661291099, -3.197775075), (16.611291099, -3.1111725346))
        make_face()
    extrude(amount=F6_T1_DEPTH, mode=Mode.SUBTRACT)

    # F7
    f7_edges = [f1.edges().sort_by_distance(p)[0] for p in [
        (14.519984, -3, 3.764315),
        (14.519984, -3, -3.764315),
    ]]
    fillet(f7_edges, radius=F7_R)

    # F8: fillet of radius 5 on 1 edges, made by hand

    # F8_s2 → F8_t1 (cut)
    with BuildSketch(Plane.XZ.offset(-4.6513967487)):
        with BuildLine():
            ThreePointArc((-3.1111725346, -16.611291099), (-3.5536996774, -15.6018521519), (-3.7643145323, -14.5199840255))
            Line((-3.7643145323, -14.5199840255), (-3.8639799126, -14.5281578841))
            ThreePointArc((-3.8639799126, -14.5281578841), (-3.9894857487, -14.7099920128), (-4.1280544247, -14.95))
            Line((-4.1280544247, -14.95), (-4.1280544247, -15.05))
            Line((-4.1280544247, -15.05), (-3.197775075, -16.661291099))
            Line((-3.197775075, -16.661291099), (-3.1111725346, -16.611291099))
        make_face()
    extrude(amount=F8_T1_DEPTH, mode=Mode.SUBTRACT)

    # F9
    f9_edges = [f1.edges().sort_by_distance(p)[0] for p in [
        (-3.764315, -3, -14.519984),
    ]]
    fillet(f9_edges, radius=F9_R)

    # F10: fillet of radius 5 on 1 edges, made by hand

    # F10_s2 → F10_t1 (cut)
    with BuildSketch(Plane.XZ.offset(-4.6513967487)):
        with BuildLine():
            ThreePointArc((3.1111725346, -16.611291099), (3.5536996774, -15.6018521519), (3.7643145323, -14.5199840255))
            Line((3.7643145323, -14.5199840255), (3.8639799126, -14.5281578841))
            ThreePointArc((3.8639799126, -14.5281578841), (3.9894857487, -14.7099920128), (4.1280544247, -14.95))
            Line((4.1280544247, -14.95), (4.1280544247, -15.05))
            Line((4.1280544247, -15.05), (3.197775075, -16.661291099))
            Line((3.197775075, -16.661291099), (3.1111725346, -16.611291099))
        make_face()
    extrude(amount=F10_T1_DEPTH, mode=Mode.SUBTRACT)

    # F11
    f11_edges = [f1.edges().sort_by_distance(p)[0] for p in [
        (3.764315, -3, -14.519984),
    ]]
    fillet(f11_edges, radius=F11_R)

    # F12: fillet of radius 5 on 2 edges, made by hand

    # F12_s2 → F12_t1 (cut)
    with BuildSketch(Plane.XZ.offset(-4.6513967487)):
        with BuildLine():
            ThreePointArc((-14.5199840255, -3.7643145323), (-15.6018521519, -3.5536996774), (-16.611291099, -3.1111725346))
            Line((-16.611291099, -3.1111725346), (-16.661291099, -3.197775075))
            Line((-16.661291099, -3.197775075), (-15.05, -4.1280544247))
            Line((-15.05, -4.1280544247), (-14.95, -4.1280544247))
            ThreePointArc((-14.95, -4.1280544247), (-14.7099920128, -3.9894857487), (-14.5281578841, -3.8639799126))
            Line((-14.5281578841, -3.8639799126), (-14.5199840255, -3.7643145323))
        make_face()
        with BuildLine():
            ThreePointArc((-16.611291099, 3.1111725346), (-15.6018521519, 3.5536996774), (-14.5199840255, 3.7643145323))
            Line((-14.5199840255, 3.7643145323), (-14.5281578841, 3.8639799126))
            ThreePointArc((-14.5281578841, 3.8639799126), (-14.7099920128, 3.9894857487), (-14.95, 4.1280544247))
            Line((-14.95, 4.1280544247), (-15.05, 4.1280544247))
            Line((-15.05, 4.1280544247), (-16.661291099, 3.197775075))
            Line((-16.661291099, 3.197775075), (-16.611291099, 3.1111725346))
        make_face()
    extrude(amount=F12_T1_DEPTH, mode=Mode.SUBTRACT)

    # F13
    f13_edges = [f1.edges().sort_by_distance(p)[0] for p in [
        (-14.519984, -3, 3.764315),
        (-14.519984, -3, -3.764315),
    ]]
    fillet(f13_edges, radius=F13_R)

    # F14 (on Front) → F15 (cut)
    with BuildSketch(Plane.XZ):
        with Locations((0, 15)):
            Circle(F14_R)
        with Locations((0, -15)):
            Circle(F14_R)
        with Locations((15, 0)):
            Circle(F14_R)
        with Locations((-15, 0)):
            Circle(F14_R)
    extrude(amount=F15_DEPTH, mode=Mode.SUBTRACT)


solid = f1.part
